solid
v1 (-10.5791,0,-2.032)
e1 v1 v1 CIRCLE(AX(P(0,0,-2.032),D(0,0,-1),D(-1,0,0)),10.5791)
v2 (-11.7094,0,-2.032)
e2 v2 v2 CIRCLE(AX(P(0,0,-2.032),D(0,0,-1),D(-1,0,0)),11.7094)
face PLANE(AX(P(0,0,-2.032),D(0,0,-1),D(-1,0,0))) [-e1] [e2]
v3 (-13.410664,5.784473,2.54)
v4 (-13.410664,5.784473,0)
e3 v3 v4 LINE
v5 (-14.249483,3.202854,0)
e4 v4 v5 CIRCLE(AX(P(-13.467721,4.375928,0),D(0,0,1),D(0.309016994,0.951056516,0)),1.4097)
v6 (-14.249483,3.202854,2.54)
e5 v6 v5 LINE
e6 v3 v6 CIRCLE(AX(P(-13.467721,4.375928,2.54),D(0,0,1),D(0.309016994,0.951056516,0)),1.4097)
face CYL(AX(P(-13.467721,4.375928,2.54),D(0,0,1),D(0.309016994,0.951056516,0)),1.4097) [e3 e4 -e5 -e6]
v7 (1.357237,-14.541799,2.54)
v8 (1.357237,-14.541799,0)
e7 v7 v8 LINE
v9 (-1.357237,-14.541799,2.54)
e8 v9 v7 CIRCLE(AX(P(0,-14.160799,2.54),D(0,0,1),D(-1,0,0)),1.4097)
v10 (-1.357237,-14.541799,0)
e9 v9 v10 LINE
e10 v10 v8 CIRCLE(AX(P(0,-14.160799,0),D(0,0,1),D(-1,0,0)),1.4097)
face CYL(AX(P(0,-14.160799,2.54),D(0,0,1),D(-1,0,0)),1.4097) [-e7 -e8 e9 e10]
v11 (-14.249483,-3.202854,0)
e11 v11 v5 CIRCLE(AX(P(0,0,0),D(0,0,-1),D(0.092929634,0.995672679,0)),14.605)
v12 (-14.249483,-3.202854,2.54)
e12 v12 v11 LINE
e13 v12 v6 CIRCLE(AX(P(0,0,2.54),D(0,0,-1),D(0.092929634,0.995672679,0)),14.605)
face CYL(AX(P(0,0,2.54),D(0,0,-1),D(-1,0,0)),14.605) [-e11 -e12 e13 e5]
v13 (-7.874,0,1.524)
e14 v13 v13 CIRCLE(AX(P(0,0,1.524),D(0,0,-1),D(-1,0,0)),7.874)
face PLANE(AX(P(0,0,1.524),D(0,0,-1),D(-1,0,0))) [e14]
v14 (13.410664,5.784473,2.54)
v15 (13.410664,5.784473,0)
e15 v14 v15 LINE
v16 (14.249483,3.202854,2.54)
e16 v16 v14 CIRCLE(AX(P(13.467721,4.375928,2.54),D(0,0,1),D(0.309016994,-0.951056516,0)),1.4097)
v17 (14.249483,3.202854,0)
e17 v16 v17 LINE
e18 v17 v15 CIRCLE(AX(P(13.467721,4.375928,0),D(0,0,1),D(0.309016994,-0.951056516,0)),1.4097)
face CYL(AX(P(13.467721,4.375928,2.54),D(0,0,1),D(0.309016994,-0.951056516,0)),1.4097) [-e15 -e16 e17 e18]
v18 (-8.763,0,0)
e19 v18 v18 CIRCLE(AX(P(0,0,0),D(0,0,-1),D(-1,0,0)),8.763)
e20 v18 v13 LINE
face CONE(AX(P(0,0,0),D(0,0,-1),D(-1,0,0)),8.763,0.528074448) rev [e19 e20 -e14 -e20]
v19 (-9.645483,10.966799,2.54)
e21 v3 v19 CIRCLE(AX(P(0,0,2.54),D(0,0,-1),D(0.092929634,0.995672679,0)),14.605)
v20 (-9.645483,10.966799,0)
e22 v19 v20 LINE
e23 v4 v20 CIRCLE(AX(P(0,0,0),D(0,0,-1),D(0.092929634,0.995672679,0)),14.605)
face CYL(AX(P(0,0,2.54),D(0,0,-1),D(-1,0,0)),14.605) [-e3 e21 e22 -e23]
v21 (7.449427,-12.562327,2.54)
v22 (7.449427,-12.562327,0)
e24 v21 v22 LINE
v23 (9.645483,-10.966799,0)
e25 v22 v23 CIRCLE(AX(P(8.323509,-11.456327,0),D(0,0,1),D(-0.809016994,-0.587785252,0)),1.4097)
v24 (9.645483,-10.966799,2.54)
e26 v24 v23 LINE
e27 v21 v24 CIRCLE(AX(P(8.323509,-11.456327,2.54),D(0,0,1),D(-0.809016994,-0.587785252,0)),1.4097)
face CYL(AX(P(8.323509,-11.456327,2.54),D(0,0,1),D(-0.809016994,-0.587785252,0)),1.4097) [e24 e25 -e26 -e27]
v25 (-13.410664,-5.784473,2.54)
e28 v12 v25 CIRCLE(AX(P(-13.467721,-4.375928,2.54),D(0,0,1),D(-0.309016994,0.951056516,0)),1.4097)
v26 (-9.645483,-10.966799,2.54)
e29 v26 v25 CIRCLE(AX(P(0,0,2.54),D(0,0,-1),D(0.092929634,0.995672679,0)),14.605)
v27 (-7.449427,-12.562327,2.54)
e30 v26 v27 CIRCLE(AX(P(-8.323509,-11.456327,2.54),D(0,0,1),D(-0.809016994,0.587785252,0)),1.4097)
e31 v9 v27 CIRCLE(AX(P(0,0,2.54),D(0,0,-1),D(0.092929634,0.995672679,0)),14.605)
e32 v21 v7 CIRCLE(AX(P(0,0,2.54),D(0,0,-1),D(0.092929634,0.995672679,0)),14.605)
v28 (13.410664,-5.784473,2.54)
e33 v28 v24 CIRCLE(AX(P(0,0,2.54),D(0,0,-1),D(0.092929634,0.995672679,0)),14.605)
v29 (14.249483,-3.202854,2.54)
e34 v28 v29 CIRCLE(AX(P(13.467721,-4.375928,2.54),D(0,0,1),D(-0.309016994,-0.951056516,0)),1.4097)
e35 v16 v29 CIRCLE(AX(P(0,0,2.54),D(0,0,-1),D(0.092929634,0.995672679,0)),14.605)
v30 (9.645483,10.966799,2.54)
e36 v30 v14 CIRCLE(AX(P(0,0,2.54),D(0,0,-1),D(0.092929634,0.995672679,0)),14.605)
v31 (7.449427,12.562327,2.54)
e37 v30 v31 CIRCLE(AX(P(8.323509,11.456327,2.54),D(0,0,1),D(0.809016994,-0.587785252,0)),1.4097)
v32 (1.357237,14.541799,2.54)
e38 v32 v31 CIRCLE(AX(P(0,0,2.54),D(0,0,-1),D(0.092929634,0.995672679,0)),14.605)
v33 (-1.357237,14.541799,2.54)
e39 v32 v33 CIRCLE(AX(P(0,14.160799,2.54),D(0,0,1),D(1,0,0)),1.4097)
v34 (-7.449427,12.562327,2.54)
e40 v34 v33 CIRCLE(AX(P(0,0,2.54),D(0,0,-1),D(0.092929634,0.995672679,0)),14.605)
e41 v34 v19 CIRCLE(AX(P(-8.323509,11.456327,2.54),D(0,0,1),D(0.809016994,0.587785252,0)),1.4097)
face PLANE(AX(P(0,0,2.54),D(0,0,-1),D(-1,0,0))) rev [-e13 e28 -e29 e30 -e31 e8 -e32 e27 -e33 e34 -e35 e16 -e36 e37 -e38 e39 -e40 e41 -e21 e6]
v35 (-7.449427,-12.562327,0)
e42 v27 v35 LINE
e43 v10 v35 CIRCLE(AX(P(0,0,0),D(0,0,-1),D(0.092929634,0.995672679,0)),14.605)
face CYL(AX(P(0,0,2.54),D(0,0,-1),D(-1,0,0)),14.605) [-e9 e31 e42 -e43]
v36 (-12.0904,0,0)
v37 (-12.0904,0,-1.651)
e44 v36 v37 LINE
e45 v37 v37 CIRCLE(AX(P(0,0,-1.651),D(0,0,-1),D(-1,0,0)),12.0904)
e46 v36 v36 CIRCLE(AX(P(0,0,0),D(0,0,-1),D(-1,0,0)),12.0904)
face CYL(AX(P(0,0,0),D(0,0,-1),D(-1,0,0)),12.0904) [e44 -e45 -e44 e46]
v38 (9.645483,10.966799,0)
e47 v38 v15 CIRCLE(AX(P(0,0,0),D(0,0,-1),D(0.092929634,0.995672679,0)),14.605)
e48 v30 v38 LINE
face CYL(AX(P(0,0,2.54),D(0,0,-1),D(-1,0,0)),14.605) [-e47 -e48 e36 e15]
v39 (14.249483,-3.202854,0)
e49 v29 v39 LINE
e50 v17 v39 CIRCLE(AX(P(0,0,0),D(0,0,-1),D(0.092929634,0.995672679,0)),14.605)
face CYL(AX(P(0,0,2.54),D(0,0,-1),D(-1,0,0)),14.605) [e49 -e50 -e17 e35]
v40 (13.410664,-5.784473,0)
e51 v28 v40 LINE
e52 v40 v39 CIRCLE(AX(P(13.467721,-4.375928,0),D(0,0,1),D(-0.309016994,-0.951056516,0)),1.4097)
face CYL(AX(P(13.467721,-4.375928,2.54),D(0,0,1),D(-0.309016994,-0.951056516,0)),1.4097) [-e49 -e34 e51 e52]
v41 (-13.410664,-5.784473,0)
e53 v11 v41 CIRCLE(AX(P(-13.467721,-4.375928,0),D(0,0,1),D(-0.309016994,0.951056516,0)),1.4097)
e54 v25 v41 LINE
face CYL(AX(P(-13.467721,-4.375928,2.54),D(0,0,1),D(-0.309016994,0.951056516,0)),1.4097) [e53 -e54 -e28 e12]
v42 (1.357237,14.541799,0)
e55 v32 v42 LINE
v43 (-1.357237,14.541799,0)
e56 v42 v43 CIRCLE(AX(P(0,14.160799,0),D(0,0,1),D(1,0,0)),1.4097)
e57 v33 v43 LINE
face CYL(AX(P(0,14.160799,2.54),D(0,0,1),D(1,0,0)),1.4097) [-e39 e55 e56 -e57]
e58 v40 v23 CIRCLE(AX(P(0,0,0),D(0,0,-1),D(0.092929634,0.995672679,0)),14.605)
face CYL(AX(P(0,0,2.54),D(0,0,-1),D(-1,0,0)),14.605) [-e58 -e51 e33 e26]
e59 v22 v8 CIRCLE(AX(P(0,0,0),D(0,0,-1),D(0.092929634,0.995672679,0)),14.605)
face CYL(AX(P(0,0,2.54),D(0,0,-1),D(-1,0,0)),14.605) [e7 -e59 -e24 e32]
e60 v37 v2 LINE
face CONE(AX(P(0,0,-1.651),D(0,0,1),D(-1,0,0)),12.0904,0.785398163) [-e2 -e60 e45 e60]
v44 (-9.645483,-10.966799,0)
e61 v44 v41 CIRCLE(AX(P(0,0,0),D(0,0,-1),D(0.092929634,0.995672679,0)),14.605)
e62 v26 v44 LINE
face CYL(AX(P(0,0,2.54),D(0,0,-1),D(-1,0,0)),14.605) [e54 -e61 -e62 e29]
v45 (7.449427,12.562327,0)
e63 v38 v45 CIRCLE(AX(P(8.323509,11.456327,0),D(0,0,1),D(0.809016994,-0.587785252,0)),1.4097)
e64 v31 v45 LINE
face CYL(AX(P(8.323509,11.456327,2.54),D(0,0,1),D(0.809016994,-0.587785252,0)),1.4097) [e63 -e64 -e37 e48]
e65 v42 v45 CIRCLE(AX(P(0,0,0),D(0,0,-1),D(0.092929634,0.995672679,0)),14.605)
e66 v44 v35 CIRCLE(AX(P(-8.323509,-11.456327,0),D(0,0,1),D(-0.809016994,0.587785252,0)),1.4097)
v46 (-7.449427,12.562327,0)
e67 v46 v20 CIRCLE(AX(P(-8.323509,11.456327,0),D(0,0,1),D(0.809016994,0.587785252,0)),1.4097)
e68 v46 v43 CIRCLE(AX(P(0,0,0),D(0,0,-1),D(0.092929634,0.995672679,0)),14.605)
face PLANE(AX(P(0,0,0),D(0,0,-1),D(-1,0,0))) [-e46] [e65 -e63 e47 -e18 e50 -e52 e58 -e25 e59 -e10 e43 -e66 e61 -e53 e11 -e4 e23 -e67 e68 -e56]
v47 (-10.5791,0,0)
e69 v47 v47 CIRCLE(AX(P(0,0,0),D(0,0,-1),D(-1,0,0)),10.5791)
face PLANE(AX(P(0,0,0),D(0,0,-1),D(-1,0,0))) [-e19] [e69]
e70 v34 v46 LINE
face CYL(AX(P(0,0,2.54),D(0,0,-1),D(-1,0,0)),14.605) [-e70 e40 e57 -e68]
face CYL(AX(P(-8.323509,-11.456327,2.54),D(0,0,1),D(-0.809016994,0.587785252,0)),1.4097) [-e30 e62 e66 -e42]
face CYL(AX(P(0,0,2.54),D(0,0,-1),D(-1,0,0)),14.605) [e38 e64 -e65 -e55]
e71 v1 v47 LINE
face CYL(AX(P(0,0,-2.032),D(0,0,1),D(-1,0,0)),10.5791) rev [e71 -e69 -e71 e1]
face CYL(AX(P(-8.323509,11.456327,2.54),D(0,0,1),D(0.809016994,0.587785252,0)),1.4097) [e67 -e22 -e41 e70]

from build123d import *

# Parameters (mm, degrees)
F3_R            = 1.4097
F4_DEPTH        = 2.54
F4_COPIES_COUNT = 10
F5_SIZE         = 0.381


# Not quite as in the source:
# - a pattern or mirror of a feature is missing from the dataset's text; its kind, count and spacing are read off the source's solid


with BuildPart() as f2:
    # F1 (on Front) → F2 (revolve)
    with BuildSketch(Plane.XZ):
        Polygon((-14.605, 0), (-12.0904, 0), (-12.0904, -2.032), (-10.5791, -2.032), (-10.5791, 0), (-8.763, 0), (-7.874, 1.524), (0, 1.524), (0, 2.54), (-14.605, 2.54), align=None)
    revolve(axis=Axis((0, 0, -1.27), (0, 0, -1)))

    # F3 (on face) → F4 (join, through all)
    with BuildSketch(Plane.XY.offset(2.54)):
        with Locations((0, 14.1607994729)):
            Circle(F3_R)
    f4 = extrude(amount=-F4_DEPTH)

    # F4_copies: F4 ×10 about axis
    f4_copies_axis = Axis((0, 0, 0), (0, 0, 1))
    for i in range(1, F4_COPIES_COUNT):
        add(f4.rotate(f4_copies_axis, i * 360 / F4_COPIES_COUNT))

    # F5
    f5_edges = [f2.edges().sort_by_distance(p)[0] for p in [
        (12.0904, 0, -2.032),
    ]]
    chamfer(f5_edges, length=F5_SIZE)


solid = f2.part
